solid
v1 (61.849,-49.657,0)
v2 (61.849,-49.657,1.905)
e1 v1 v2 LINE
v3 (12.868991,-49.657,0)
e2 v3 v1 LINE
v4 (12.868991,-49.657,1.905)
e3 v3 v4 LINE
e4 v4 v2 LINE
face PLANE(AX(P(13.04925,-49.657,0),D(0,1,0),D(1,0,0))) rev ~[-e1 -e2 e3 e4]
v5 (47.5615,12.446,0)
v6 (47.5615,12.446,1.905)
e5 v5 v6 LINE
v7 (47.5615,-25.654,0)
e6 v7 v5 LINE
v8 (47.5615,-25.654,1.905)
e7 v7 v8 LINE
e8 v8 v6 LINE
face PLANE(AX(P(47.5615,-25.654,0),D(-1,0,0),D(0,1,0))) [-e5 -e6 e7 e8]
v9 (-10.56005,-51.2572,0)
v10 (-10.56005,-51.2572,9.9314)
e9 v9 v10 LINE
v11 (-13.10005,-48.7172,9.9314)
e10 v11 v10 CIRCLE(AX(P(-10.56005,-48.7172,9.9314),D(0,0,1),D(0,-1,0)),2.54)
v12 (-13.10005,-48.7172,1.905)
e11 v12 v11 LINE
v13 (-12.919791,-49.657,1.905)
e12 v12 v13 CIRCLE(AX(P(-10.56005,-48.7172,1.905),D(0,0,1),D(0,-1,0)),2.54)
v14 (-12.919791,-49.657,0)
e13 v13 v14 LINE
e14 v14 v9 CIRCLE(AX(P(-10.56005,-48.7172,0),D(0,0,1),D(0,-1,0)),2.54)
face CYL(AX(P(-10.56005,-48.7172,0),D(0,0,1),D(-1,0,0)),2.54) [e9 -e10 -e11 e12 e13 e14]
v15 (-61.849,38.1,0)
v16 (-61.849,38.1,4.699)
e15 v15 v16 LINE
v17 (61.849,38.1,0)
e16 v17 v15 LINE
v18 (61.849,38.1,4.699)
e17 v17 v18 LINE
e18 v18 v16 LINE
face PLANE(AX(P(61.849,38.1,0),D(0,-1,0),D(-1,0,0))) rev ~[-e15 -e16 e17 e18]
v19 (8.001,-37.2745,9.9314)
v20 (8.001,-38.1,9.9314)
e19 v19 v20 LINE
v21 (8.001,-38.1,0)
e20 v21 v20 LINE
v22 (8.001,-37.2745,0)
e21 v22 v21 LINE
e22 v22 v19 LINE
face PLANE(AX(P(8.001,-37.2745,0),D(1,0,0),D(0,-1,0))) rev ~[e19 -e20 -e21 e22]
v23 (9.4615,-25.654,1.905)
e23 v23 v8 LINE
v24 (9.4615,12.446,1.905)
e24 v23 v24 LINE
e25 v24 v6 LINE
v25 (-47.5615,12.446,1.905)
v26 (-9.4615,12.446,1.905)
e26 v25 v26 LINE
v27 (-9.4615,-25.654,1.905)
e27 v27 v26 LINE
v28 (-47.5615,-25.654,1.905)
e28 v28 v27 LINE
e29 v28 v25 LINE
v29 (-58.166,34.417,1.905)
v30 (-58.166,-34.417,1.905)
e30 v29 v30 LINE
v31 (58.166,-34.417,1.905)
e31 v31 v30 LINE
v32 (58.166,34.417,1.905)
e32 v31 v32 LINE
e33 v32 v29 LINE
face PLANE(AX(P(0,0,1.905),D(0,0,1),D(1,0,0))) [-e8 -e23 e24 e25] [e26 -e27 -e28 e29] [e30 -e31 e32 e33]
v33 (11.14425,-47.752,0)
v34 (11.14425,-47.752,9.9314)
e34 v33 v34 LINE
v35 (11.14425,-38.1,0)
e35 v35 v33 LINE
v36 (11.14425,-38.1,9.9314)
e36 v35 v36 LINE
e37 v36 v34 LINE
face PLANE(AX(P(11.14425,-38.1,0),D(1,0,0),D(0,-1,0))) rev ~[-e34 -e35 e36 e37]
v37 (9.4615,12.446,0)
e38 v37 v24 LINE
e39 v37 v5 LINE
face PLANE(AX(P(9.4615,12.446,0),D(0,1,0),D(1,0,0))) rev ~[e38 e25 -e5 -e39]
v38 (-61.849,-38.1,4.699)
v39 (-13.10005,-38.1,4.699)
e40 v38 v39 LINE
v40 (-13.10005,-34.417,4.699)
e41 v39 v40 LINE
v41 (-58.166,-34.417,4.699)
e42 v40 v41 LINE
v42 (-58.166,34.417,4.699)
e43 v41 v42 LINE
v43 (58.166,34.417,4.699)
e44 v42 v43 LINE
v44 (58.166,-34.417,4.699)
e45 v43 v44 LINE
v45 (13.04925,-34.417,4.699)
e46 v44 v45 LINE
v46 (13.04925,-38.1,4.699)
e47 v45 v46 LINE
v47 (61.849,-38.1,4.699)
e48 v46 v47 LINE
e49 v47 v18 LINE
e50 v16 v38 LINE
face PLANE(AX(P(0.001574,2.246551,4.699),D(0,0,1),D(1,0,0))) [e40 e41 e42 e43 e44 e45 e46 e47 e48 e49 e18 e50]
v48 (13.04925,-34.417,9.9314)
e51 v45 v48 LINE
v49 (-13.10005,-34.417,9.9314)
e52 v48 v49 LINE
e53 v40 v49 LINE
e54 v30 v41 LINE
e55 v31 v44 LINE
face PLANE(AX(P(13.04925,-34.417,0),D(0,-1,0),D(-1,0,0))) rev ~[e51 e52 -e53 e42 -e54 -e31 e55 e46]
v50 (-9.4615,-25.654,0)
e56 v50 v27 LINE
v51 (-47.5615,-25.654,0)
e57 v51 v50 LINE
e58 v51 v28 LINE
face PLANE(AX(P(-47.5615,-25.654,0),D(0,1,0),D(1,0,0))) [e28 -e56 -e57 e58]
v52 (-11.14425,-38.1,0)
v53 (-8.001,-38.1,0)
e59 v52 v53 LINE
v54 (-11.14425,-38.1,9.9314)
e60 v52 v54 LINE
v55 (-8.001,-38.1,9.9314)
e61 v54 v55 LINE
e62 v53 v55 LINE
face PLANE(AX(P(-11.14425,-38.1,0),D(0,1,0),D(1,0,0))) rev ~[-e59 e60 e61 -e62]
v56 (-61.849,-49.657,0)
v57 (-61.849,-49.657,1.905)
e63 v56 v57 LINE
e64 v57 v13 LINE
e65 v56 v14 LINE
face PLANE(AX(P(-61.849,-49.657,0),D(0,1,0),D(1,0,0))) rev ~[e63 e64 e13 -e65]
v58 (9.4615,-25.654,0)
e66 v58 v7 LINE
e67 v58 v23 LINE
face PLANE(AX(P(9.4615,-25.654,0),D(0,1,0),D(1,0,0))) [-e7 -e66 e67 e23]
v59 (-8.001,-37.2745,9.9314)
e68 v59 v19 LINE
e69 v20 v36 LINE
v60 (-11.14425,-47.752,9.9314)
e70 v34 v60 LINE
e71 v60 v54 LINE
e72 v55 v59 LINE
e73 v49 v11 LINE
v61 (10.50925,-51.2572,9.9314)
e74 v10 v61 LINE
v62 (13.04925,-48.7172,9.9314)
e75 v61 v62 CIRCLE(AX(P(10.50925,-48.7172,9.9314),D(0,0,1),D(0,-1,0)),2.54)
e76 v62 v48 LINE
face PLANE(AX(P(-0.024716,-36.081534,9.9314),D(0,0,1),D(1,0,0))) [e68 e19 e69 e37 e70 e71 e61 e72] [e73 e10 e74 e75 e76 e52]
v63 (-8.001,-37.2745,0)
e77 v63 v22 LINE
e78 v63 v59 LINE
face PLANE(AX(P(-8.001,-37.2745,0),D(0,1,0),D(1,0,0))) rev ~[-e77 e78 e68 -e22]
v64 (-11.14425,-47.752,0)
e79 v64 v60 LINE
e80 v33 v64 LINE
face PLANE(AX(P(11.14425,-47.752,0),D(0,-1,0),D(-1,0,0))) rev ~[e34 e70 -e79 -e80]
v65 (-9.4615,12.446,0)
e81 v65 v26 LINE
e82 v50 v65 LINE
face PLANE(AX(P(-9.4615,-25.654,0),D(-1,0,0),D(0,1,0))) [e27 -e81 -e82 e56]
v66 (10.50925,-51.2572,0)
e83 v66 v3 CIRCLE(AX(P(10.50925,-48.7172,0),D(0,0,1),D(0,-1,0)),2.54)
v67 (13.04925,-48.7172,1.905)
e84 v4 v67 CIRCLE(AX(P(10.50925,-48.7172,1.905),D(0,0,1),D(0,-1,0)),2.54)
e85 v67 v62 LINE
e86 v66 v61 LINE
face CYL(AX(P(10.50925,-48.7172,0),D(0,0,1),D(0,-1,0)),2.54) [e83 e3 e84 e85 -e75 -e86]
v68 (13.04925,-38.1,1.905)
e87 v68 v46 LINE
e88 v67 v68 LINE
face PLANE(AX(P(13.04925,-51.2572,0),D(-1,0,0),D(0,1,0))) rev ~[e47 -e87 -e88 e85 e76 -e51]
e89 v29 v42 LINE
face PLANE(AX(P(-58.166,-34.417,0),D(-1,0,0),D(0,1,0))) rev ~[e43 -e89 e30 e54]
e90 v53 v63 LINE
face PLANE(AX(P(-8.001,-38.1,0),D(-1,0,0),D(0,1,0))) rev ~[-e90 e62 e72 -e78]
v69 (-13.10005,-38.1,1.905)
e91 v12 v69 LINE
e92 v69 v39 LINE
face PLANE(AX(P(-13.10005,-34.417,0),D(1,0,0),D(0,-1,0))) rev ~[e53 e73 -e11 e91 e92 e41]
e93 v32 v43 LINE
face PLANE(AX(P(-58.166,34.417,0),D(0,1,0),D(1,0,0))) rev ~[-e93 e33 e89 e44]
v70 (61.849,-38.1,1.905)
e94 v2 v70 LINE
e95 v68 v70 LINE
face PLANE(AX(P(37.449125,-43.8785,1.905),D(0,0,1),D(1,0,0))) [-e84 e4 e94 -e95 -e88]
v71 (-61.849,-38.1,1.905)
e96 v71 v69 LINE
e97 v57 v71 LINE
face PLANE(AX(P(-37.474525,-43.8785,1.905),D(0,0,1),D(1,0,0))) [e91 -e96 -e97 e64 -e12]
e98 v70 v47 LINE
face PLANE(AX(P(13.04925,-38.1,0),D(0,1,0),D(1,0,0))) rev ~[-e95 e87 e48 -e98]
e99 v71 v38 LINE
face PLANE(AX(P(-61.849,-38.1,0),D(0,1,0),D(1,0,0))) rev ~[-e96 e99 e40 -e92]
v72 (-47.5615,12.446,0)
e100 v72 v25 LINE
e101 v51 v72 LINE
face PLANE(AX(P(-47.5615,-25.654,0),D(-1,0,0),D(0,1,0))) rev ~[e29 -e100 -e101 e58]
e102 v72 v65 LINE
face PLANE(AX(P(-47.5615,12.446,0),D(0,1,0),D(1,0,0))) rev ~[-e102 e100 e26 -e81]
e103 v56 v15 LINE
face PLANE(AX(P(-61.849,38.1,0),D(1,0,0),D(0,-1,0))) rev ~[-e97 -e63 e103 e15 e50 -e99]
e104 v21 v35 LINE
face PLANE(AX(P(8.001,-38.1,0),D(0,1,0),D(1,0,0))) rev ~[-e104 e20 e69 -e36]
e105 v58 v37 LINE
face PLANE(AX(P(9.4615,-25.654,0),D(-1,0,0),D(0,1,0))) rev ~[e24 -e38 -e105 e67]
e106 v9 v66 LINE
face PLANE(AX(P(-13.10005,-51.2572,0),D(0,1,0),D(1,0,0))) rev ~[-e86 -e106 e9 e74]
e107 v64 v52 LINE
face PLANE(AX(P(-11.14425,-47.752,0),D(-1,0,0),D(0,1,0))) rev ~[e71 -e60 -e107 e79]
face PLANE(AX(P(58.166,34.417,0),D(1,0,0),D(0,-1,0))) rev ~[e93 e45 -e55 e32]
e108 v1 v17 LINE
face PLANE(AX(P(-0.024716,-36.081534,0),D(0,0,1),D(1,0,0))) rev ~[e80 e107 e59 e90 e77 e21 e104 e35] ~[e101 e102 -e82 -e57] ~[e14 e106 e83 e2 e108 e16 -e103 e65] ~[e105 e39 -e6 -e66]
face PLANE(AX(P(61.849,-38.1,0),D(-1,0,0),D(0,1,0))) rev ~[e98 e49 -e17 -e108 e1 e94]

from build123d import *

# Parameters (mm, degrees)
F0_W     = 38.1
F0_H     = 38.1
F1_DEPTH = 1.905
F0_W_2   = 48.74895
F0_H_2   = 11.557
F0_W_3   = 48.79975
F2_DEPTH = 4.699
F0_W_4   = 13.589
F0_H_3   = 3.5052
F3_DEPTH = 9.9314
F4_R     = 2.54


# Not quite as in the source:
# - a feature names something its author has since deleted; it is built from what else it names


with BuildPart() as f1:
    # F0 (on Top) → F1 (new body)
    with BuildSketch(Plane.XY):
        Polygon((-13.10005, -34.417), (13.04925, -34.417), (58.166, -34.417), (58.166, 34.417), (-58.166, 34.417), (-58.166, -34.417), align=None)
        with Locations((-28.5115, -6.604)):
            Rectangle(F0_W, F0_H, mode=Mode.SUBTRACT)
        with Locations((28.5115, -6.604)):
            Rectangle(F0_W, F0_H, mode=Mode.SUBTRACT)
    extrude(amount=F1_DEPTH)



with BuildPart() as f1b:
    # F0 (on Top) → F1, piece 2 (new body)
    with BuildSketch(Plane.XY):
        with Locations((-37.474525, -43.8785)):
            Rectangle(F0_W_2, F0_H_2)
    extrude(amount=F1_DEPTH)


with BuildPart() as f1c:
    # F0 (on Top) → F1, piece 3 (new body)
    with BuildSketch(Plane.XY):
        with Locations((37.449125, -43.8785)):
            Rectangle(F0_W_3, F0_H_2)
    extrude(amount=F1_DEPTH)


with BuildPart() as f1_1:
    add(f1.part)

    add(f1b.part)  # F2 merges F1b

    add(f1c.part)  # F2 merges F1c
    # F0 (on Top) → F2 (join)
    with BuildSketch(Plane.XY):
        Polygon((61.849, -38.1), (61.849, 38.1), (-61.849, 38.1), (-61.849, -38.1), (-13.10005, -38.1), (-13.10005, -34.417), (-58.166, -34.417), (-58.166, 34.417), (58.166, 34.417), (58.166, -34.417), (13.04925, -34.417), (13.04925, -38.1), align=None)
    extrude(amount=F2_DEPTH)

    # F0 (on Top) → F3 (join)
    with BuildSketch(Plane.XY):
        Polygon((11.14425, -38.1), (13.04925, -38.1), (13.04925, -34.417), (-13.10005, -34.417), (-13.10005, -38.1), (-11.14425, -38.1), (-8.001, -38.1), (-8.001, -37.2745), (8.001, -37.2745), (8.001, -38.1), align=None)
        Polygon((-11.14425, -38.1), (-13.10005, -38.1), (-13.10005, -49.657), (-13.10005, -51.2572), (-6.7945, -51.2572), (-6.7945, -47.752), (-11.14425, -47.752), align=None)
        Polygon((13.04925, -49.657), (13.04925, -38.1), (11.14425, -38.1), (11.14425, -47.752), (6.7945, -47.752), (6.7945, -51.2572), (13.04925, -51.2572), align=None)
        with Locations((0, -49.5046)):
            Rectangle(F0_W_4, F0_H_3)
    extrude(amount=F3_DEPTH)

    # F4
    f4_edges = [f1_1.edges().sort_by_distance(p)[0] for p in [
        (-13.10005, -51.2572, 4.9657),
        (13.04925, -51.2572, 4.9657),
    ]]
    fillet(f4_edges, radius=F4_R)


solid = f1_1.part
